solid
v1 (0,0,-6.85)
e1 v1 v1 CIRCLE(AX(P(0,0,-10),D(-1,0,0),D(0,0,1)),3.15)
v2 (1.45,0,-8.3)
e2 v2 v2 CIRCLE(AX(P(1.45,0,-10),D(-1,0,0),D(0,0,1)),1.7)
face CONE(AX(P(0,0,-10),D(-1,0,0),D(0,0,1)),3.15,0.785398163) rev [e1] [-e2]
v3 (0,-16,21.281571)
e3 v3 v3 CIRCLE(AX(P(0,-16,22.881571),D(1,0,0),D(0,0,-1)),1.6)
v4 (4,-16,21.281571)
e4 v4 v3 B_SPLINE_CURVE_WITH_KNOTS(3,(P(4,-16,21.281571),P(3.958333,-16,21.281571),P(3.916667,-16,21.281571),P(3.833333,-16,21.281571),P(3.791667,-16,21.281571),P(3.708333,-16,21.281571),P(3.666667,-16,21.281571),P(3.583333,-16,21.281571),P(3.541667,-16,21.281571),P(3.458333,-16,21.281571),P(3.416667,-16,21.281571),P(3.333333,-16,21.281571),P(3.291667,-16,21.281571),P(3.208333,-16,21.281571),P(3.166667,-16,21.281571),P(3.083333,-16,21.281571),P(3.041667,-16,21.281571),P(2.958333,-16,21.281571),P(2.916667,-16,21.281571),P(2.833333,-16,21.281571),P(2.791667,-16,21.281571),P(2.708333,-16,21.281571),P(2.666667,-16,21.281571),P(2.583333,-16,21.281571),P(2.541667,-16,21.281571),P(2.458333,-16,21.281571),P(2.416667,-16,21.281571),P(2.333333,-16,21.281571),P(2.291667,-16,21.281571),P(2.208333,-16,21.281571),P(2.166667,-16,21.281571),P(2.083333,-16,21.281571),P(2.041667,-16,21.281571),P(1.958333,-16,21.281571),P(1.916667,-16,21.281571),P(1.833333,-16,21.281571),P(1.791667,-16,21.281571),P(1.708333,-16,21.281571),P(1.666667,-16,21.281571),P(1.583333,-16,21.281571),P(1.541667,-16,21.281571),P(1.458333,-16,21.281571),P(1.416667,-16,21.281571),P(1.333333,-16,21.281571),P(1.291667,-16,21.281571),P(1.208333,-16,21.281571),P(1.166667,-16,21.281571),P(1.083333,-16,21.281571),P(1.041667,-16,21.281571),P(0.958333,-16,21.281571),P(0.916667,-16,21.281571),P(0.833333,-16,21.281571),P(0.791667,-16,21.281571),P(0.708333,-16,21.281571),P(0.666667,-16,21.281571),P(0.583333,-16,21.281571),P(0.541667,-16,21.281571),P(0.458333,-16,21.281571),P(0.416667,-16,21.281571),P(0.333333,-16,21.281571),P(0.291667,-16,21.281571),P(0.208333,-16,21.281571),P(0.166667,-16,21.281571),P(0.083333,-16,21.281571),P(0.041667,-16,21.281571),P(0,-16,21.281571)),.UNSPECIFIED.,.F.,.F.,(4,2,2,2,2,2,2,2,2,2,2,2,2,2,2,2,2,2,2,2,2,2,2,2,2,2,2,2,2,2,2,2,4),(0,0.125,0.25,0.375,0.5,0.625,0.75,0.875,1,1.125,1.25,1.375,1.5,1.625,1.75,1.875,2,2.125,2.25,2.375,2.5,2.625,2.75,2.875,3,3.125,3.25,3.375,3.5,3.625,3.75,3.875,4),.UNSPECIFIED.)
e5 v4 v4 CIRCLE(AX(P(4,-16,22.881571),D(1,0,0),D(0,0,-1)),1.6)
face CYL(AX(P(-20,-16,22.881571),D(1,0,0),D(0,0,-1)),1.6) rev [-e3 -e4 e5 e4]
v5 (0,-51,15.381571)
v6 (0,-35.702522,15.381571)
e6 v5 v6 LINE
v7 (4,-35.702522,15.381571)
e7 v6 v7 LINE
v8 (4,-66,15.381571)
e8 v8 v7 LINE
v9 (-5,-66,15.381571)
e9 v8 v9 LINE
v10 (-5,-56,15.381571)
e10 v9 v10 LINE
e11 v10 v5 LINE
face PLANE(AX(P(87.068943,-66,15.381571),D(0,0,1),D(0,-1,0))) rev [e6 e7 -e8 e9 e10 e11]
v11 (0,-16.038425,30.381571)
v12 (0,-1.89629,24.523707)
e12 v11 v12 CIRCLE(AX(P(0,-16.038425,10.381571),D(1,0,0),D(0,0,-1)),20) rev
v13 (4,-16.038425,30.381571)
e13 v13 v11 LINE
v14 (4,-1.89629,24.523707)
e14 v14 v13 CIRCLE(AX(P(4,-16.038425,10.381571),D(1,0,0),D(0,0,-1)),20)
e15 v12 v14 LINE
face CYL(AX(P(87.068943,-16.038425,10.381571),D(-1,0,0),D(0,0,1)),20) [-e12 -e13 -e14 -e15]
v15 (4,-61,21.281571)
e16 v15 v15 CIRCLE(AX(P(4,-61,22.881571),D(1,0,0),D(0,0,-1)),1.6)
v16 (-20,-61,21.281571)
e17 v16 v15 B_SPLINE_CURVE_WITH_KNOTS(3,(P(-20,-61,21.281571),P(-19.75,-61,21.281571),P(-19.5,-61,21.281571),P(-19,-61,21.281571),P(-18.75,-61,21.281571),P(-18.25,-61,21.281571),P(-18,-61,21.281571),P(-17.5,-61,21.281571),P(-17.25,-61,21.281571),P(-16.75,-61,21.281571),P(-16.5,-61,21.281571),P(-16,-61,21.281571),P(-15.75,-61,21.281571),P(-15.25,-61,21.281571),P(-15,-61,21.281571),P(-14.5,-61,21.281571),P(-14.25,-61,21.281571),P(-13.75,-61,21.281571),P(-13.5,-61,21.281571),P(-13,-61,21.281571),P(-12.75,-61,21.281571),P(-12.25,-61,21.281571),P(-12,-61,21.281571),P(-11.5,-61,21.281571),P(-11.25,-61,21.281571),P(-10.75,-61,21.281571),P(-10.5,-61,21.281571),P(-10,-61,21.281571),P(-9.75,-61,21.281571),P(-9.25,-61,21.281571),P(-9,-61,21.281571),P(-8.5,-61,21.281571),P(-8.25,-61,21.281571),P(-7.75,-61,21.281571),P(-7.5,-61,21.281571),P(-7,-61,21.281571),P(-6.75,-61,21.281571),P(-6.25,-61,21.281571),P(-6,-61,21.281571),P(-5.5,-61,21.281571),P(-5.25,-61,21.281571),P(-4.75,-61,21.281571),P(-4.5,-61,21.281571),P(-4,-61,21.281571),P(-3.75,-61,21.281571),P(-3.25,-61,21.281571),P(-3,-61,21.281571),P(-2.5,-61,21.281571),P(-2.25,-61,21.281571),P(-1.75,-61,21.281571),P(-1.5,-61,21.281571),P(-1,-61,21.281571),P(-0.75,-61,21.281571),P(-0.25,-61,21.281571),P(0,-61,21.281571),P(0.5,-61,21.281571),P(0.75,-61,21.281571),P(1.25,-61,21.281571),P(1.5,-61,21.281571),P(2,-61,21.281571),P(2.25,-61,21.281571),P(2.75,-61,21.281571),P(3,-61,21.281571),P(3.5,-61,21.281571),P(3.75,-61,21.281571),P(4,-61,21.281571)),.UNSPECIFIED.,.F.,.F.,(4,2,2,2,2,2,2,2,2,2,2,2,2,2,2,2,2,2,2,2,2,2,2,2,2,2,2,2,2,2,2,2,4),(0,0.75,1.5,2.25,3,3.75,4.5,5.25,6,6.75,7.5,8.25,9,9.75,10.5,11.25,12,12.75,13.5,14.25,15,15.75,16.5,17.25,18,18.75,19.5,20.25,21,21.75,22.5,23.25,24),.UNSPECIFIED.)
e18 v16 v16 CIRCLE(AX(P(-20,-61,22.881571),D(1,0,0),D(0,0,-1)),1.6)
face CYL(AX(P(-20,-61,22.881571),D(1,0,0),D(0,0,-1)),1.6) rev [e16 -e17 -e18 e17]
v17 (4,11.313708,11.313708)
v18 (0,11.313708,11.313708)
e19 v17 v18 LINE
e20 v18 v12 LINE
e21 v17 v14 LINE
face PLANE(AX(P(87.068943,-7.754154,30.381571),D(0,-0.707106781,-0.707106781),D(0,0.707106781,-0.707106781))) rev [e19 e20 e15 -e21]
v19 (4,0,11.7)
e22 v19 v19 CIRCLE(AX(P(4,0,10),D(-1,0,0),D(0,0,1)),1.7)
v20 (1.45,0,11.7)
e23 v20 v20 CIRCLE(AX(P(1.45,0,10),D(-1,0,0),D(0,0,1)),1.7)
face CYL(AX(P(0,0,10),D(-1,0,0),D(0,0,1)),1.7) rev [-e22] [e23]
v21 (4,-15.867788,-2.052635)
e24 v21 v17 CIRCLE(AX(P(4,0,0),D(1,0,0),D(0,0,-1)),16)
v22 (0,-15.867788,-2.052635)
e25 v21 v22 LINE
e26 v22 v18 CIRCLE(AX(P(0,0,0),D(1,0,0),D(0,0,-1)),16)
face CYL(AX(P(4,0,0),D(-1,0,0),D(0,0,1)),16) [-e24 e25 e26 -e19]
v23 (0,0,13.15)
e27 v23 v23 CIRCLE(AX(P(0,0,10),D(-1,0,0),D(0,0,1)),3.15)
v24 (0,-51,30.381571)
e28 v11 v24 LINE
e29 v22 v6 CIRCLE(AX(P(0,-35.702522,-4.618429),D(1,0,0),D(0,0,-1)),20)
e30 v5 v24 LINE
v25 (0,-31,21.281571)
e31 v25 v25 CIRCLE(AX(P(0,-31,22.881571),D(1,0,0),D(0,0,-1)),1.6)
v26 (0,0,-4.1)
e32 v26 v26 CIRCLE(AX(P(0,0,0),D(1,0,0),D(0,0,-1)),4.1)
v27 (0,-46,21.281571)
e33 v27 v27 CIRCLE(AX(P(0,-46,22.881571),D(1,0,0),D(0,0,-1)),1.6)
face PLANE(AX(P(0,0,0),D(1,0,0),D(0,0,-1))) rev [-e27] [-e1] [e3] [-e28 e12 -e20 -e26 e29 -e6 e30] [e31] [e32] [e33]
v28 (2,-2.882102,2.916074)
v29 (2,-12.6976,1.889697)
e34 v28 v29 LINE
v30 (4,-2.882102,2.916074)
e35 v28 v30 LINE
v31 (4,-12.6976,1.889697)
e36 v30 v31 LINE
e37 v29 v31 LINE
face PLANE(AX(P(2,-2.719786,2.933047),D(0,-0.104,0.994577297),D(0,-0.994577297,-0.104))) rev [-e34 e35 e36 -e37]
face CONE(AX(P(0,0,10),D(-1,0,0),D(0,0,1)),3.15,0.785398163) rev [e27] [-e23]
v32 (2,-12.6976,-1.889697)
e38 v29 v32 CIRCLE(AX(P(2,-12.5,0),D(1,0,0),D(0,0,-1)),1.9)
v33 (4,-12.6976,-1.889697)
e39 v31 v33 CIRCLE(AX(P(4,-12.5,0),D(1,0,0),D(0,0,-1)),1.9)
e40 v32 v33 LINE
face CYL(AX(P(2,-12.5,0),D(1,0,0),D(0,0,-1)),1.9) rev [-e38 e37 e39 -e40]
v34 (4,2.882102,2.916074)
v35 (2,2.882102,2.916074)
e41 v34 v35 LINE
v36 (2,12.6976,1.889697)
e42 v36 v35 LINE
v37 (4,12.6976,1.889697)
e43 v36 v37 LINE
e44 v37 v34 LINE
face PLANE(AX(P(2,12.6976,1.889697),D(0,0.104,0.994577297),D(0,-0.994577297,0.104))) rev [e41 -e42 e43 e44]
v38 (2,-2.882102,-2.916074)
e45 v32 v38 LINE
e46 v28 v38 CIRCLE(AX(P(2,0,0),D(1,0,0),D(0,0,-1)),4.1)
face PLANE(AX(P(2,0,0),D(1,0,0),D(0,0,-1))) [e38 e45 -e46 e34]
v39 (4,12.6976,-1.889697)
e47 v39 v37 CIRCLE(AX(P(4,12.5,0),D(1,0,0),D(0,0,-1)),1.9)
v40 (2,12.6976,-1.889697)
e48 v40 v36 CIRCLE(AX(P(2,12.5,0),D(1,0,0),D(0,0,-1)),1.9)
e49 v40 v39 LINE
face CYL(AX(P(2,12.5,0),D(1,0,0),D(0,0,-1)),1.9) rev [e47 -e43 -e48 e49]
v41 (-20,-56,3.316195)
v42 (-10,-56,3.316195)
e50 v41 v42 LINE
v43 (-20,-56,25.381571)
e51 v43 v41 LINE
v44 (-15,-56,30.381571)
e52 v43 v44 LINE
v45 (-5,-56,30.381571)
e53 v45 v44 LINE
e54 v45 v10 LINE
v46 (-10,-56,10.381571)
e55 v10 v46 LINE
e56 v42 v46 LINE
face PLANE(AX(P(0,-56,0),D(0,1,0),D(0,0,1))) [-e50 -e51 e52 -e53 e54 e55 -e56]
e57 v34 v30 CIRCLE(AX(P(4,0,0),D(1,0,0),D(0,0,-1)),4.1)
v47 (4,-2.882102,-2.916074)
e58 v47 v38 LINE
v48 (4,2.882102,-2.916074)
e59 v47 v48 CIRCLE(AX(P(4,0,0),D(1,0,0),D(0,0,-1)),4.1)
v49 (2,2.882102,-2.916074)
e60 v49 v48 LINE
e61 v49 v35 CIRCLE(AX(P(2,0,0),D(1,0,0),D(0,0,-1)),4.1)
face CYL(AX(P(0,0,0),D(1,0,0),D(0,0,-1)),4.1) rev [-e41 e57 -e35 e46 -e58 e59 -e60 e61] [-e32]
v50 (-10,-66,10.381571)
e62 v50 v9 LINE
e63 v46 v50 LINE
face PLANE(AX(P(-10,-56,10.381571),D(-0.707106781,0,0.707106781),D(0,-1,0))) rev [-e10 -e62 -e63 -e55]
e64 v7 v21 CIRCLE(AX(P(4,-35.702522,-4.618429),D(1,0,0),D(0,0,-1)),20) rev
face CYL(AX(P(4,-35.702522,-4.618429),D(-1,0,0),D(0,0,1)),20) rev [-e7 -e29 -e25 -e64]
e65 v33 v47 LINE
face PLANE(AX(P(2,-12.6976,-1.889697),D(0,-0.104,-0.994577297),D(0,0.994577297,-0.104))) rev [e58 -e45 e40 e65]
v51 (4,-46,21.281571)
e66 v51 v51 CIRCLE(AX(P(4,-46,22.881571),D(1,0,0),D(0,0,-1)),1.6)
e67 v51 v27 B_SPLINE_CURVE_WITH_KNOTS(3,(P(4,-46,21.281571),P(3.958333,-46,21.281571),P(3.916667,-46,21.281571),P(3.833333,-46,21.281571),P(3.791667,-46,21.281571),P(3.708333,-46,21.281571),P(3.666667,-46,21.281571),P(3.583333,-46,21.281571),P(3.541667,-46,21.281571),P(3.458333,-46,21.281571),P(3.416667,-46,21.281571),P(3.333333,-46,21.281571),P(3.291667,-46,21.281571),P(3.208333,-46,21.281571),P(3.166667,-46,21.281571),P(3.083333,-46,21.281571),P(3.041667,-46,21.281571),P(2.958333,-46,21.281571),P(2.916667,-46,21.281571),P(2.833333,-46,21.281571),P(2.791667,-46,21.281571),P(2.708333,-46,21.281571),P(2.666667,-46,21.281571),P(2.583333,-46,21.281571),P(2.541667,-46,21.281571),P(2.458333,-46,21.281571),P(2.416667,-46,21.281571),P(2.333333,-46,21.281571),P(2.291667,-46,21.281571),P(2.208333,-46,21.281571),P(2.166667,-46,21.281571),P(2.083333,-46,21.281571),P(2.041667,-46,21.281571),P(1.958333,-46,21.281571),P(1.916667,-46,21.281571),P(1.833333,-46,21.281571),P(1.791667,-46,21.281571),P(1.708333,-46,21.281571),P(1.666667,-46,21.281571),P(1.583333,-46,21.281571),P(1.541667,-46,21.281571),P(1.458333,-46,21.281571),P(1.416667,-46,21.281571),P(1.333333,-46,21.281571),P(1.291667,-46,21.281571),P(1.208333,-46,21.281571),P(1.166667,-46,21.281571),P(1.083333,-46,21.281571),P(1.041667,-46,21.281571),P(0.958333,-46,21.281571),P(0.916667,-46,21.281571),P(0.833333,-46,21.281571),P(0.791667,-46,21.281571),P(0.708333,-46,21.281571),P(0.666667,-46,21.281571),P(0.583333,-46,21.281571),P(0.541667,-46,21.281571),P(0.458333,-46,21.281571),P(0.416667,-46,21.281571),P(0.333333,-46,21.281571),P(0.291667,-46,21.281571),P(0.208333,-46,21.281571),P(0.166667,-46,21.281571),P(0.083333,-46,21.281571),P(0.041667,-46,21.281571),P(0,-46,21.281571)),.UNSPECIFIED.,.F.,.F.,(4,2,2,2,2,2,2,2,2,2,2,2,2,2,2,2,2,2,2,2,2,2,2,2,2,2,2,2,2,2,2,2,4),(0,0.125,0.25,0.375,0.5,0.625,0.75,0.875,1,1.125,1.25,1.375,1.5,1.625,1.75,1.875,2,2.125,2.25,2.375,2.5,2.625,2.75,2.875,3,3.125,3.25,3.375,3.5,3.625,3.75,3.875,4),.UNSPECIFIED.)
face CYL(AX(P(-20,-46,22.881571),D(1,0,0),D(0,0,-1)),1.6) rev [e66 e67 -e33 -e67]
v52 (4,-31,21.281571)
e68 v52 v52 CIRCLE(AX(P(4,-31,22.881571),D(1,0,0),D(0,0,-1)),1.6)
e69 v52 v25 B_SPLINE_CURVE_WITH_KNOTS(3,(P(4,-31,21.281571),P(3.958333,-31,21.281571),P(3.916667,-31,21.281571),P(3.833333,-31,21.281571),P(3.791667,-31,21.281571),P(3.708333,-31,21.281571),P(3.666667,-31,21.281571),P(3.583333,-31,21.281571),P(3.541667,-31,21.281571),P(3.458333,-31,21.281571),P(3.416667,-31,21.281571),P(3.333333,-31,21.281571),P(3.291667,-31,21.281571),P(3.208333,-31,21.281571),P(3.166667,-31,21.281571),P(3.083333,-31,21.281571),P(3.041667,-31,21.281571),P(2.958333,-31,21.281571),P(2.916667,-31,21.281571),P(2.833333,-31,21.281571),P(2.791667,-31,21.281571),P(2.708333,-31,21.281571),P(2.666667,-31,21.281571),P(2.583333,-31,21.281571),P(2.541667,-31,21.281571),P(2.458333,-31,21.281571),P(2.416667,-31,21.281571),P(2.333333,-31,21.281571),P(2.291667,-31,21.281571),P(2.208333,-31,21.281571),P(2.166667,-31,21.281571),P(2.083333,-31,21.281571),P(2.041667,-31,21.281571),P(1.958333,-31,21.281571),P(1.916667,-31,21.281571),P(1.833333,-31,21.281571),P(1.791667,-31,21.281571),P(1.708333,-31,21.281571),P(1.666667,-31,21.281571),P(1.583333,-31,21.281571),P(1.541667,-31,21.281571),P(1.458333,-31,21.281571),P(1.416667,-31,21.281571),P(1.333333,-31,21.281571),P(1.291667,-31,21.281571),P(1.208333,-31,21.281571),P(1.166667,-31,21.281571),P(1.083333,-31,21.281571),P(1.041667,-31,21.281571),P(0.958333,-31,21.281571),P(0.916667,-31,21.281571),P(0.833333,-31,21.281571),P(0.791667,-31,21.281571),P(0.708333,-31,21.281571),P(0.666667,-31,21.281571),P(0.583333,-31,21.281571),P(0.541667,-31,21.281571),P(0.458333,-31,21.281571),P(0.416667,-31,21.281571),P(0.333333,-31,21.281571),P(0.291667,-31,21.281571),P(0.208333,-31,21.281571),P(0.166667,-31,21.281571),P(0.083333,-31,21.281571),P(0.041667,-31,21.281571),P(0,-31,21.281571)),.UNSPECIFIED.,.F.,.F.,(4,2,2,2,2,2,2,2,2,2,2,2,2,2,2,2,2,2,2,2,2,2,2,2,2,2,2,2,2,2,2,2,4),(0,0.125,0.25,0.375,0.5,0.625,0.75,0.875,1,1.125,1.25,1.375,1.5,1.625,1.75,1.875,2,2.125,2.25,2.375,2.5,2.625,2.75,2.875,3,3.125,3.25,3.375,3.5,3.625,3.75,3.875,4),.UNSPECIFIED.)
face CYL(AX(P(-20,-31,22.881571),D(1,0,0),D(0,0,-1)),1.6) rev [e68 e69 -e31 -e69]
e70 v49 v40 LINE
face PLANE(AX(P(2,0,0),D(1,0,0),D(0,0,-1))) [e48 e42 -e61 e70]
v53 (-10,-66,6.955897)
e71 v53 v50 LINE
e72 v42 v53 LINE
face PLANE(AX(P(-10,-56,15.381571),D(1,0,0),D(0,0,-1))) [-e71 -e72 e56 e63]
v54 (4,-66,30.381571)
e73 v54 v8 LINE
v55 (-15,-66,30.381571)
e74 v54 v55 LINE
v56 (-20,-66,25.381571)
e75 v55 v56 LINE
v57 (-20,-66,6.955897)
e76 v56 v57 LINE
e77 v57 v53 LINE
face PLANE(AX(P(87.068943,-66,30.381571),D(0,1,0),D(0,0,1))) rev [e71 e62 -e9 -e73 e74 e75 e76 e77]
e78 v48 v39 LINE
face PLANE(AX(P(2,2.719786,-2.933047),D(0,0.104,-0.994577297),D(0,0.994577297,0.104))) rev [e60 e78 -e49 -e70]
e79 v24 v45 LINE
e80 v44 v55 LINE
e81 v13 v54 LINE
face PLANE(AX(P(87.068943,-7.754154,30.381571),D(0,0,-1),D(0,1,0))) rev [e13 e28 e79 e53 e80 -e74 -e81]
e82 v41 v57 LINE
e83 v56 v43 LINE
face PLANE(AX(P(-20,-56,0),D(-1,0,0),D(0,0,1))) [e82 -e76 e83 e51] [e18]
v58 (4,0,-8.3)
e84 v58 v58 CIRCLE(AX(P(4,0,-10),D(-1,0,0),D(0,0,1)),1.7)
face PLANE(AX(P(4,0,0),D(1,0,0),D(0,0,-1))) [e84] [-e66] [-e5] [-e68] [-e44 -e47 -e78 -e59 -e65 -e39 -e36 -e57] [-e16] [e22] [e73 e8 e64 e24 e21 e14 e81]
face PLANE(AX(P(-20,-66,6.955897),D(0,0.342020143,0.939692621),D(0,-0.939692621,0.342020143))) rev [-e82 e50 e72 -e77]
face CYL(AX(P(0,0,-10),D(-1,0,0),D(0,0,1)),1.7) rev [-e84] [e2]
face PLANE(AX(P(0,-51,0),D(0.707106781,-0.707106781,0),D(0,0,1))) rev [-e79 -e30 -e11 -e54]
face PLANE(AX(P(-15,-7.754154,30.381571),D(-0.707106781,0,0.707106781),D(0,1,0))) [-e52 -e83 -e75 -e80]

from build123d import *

# Parameters (mm, degrees)
SKETCH1_R                                           = 16
BOSS_EXTRUDE1_DEPTH                                 = 4
CUT_EXTRUDE2_DEPTH                                  = 2
SKETCH3_R                                           = 4.1
CUT_EXTRUDE1_DEPTH                                  = 23.978250586
CSK_FOR_M3_COUNTERSUNK_FLAT_HEAD_SCREW1_D           = 3.4
CSK_FOR_M3_COUNTERSUNK_FLAT_HEAD_SCREW1_CSINK_D     = 6.3
CSK_FOR_M3_COUNTERSUNK_FLAT_HEAD_SCREW1_CSINK_ANGLE = 90
BOSS_EXTRUDE3_DEPTH                                 = 4
FILLET3_R                                           = 20
BOSS_EXTRUDE4_DEPTH                                 = 10
CHAMFER1_SIZE                                       = 5
CUT_EXTRUDE5_DEPTH                                  = 74.993512369
SKETCH10_R                                          = 1.6
CUT_EXTRUDE4_DEPTH                                  = 77.518232271


with BuildPart() as part:
    # Sketch1 → Boss-Extrude1 (new body)
    with BuildSketch(Plane(origin=(0, 0, 0), x_dir=(0, 0, -1), z_dir=(1, 0, 0))):
        Circle(SKETCH1_R)
    extrude(amount=BOSS_EXTRUDE1_DEPTH)

    # Sketch5 → Cut-Extrude2 (cut)
    with BuildSketch(Plane(origin=(4, 0, 0), x_dir=(0, 0, -1), z_dir=(1, 0, 0))):
        with BuildLine():
            Line((-1.889696865, 12.6976), (-2.933047351, 2.719785513))
            ThreePointArc((-2.933047351, 2.719785513), (-4, 0), (-2.933047351, -2.719785513))
            Line((-2.933047351, -2.719785513), (-1.889696865, -12.6976))
            ThreePointArc((-1.889696865, -12.6976), (0, -14.4), (1.889696865, -12.6976))
            Line((1.889696865, -12.6976), (2.933047351, -2.719785513))
            ThreePointArc((2.933047351, -2.719785513), (4, 0), (2.933047351, 2.719785513))
            Line((2.933047351, 2.719785513), (1.889696865, 12.6976))
            ThreePointArc((1.889696865, 12.6976), (0, 14.4), (-1.889696865, 12.6976))
        make_face()
    extrude(amount=-CUT_EXTRUDE2_DEPTH, mode=Mode.SUBTRACT)

    # Sketch3 → Cut-Extrude1 (cut, through all)
    with BuildSketch(Plane(origin=(4, 0, 0), x_dir=(0, 0, -1), z_dir=(1, 0, 0))):
        Circle(SKETCH3_R)
    extrude(amount=-CUT_EXTRUDE1_DEPTH, mode=Mode.SUBTRACT)

    # CSK for M3 Countersunk Flat Head Screw1 (through all)
    with Locations(Plane.ZY):
        with Locations((-10, 0), (10, 0)):
            CounterSinkHole(CSK_FOR_M3_COUNTERSUNK_FLAT_HEAD_SCREW1_D / 2, CSK_FOR_M3_COUNTERSUNK_FLAT_HEAD_SCREW1_CSINK_D / 2, counter_sink_angle=CSK_FOR_M3_COUNTERSUNK_FLAT_HEAD_SCREW1_CSINK_ANGLE)

    # Sketch9 → Boss-Extrude3 (add)
    with BuildSketch(Plane(origin=(0, 0, 0), x_dir=(0, 0, -1), z_dir=(1, 0, 0))):
        with BuildLine():
            Line((-30.381570905, -7.754153907), (-30.381570905, -66))
            Line((-30.381570905, -66), (-15.381570905, -66))
            Line((-15.381570905, -66), (-15.381570905, -16))
            Line((-15.381570905, -16), (0, -16))
            ThreePointArc((0, -16), (-14.78207252, -6.122934918), (-11.313708499, 11.313708499))
            Line((-11.313708499, 11.313708499), (-30.381570905, -7.754153907))
        make_face()
    extrude(amount=BOSS_EXTRUDE3_DEPTH)

    # Fillet3
    fillet3_edges = [part.edges().sort_by_distance(p)[0] for p in [
        (2, -7.754153907, 30.381570905),
        (2, -16, 15.381570905),
    ]]
    fillet(fillet3_edges, radius=FILLET3_R)

    # Sketch11 → Boss-Extrude4 (add)
    with BuildSketch(Plane.XZ.offset(66)):
        Polygon((0, 15.381570905), (-10, 15.381570905), (-10, 0), (-20, 0), (-20, 30.381570905), (0, 30.381570905), align=None)
    extrude(amount=-BOSS_EXTRUDE4_DEPTH)

    # Chamfer1
    chamfer1_edges = [part.edges().sort_by_distance(p)[0] for p in [
        (-10, -61, 15.381570905),
        (-20, -61, 30.381570905),
        (0, -56, 22.881570905),
    ]]
    chamfer(chamfer1_edges, length=CHAMFER1_SIZE - 0.0001)  # a hair under: the kernel refuses the full size

    # Sketch12 → Cut-Extrude5 (cut, through all)
    with BuildSketch(Plane(origin=(-10, 0, 0), x_dir=(0, 0, -1), z_dir=(1, 0, 0))):
        Polygon((-6.955897301, -66), (-3.316194958, -56), (0, -56), (0, -66), align=None)
    extrude(amount=-CUT_EXTRUDE5_DEPTH, mode=Mode.SUBTRACT)

    # Sketch10 → Cut-Extrude4 (cut, through all)
    with BuildSketch(Plane(origin=(4, 0, 0), x_dir=(0, 0, -1), z_dir=(1, 0, 0))):
        with Locations((-22.881570905, -16)):
            Circle(SKETCH10_R)
        with Locations((-22.881570905, -31)):
            Circle(SKETCH10_R)
        with Locations((-22.881570905, -46)):
            Circle(SKETCH10_R)
        with Locations((-22.881570905, -61)):
            Circle(SKETCH10_R)
    extrude(amount=-CUT_EXTRUDE4_DEPTH, mode=Mode.SUBTRACT)


solid = part.part
